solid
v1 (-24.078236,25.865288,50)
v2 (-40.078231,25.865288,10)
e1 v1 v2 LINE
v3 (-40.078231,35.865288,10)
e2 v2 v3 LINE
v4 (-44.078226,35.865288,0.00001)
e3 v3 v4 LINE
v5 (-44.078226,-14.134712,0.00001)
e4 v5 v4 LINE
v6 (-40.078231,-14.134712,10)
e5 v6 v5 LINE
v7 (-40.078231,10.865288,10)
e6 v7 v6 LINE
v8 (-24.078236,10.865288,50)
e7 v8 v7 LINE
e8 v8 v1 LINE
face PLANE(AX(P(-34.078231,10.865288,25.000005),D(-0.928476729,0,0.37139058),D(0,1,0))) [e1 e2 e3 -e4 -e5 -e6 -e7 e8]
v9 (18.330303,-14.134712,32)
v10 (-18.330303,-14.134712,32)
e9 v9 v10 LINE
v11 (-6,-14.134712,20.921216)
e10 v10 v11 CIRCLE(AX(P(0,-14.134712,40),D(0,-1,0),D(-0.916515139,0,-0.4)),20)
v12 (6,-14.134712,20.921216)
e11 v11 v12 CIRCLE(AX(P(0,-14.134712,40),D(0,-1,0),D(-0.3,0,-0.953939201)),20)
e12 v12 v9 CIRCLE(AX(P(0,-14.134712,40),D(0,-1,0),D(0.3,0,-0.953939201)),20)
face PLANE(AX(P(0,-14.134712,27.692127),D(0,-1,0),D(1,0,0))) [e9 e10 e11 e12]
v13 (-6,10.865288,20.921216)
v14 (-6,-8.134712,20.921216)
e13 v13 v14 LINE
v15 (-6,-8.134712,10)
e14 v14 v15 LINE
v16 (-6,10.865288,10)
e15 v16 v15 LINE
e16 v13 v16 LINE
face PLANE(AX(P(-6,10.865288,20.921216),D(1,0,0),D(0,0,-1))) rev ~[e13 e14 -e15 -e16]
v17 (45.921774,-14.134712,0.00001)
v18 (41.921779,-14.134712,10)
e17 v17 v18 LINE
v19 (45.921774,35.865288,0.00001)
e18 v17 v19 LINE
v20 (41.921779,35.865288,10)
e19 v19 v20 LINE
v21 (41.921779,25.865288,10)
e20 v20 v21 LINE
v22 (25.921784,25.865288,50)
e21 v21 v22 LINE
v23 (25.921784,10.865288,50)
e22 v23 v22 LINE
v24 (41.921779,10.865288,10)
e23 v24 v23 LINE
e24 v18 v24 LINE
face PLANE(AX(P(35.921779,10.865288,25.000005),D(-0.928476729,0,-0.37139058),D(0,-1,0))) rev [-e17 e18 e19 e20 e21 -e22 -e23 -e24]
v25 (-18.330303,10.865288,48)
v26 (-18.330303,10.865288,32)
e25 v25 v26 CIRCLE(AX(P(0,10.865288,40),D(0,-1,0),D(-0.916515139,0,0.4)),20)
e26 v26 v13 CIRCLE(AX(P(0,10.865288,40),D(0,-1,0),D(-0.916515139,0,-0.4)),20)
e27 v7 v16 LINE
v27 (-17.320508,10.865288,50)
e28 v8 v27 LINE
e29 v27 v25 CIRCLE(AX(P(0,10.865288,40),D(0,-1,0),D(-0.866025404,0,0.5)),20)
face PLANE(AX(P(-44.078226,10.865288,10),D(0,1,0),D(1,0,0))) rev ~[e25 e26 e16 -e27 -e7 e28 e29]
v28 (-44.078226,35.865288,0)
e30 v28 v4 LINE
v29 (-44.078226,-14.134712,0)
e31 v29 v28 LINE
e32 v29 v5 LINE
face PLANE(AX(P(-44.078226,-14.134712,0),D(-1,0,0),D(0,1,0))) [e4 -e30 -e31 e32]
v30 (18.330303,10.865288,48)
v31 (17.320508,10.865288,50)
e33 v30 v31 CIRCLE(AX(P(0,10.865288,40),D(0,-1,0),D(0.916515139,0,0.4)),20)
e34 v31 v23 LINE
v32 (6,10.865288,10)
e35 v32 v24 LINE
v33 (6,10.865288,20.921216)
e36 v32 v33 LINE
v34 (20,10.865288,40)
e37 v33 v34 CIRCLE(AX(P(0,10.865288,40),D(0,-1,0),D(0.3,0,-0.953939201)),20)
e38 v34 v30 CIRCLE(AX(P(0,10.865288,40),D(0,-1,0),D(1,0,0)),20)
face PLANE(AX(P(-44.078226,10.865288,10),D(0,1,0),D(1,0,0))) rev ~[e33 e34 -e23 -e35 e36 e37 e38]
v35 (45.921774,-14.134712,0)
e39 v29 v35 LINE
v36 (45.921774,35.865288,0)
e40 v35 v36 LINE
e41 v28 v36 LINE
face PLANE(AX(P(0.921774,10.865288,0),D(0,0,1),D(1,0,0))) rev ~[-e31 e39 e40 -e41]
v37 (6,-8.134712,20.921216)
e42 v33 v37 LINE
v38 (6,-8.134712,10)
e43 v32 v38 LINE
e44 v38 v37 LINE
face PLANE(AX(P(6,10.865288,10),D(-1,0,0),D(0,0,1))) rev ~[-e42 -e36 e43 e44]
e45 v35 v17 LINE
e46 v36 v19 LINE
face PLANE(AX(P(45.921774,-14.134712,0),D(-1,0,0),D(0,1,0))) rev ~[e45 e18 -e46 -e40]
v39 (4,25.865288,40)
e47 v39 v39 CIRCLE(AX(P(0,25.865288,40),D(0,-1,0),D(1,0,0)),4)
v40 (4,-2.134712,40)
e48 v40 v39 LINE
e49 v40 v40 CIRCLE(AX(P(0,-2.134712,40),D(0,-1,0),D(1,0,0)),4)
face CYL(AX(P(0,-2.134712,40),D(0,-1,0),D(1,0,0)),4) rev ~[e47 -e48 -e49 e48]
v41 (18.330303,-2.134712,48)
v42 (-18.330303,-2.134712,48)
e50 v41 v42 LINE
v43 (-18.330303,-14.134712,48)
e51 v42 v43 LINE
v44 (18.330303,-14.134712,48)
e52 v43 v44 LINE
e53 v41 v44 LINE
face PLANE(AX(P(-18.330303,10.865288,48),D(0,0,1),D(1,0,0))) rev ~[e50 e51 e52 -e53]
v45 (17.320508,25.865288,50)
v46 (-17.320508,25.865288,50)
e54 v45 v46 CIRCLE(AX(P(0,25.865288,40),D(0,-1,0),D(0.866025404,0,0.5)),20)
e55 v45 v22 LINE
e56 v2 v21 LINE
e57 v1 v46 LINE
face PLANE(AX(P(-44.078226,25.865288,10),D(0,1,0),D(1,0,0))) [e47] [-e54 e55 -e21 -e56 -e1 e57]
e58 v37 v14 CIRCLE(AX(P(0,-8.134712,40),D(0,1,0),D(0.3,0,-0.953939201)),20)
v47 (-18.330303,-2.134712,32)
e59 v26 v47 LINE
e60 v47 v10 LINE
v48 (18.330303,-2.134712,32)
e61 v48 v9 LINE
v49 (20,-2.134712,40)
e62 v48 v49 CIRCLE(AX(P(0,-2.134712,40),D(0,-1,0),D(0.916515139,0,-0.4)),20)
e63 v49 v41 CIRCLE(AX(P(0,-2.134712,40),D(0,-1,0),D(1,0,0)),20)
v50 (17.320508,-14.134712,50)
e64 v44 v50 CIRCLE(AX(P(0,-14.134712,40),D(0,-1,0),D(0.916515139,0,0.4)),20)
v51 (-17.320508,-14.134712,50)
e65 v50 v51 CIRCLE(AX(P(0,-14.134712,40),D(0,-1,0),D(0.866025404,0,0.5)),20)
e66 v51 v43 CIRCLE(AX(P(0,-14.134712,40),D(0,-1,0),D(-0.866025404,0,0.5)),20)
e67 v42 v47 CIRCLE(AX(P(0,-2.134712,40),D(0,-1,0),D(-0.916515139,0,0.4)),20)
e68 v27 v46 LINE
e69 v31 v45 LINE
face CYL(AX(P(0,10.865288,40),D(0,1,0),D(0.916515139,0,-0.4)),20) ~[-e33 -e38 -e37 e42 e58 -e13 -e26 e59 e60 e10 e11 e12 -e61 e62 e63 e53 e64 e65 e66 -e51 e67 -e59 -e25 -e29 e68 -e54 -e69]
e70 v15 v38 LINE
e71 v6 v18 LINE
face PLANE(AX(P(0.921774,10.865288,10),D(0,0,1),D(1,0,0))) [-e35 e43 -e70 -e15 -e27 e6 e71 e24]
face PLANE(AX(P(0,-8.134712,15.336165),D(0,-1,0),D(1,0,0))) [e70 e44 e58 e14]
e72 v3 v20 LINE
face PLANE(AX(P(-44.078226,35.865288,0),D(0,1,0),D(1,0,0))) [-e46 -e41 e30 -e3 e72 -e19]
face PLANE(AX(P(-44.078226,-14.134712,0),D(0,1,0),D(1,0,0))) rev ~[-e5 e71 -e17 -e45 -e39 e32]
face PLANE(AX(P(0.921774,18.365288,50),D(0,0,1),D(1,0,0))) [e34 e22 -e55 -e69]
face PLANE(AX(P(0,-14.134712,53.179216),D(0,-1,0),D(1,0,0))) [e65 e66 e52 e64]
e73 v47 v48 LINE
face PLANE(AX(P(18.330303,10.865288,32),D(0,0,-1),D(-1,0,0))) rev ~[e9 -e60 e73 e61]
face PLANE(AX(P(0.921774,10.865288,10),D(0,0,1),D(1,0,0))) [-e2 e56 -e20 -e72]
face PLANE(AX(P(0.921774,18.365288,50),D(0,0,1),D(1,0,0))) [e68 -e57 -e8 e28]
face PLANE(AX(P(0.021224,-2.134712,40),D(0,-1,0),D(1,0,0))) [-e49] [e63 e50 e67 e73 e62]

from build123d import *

# Parameters (mm, degrees)
F0_W      = 90
F0_H      = 50
F1_DEPTH  = 10
F2_W      = 90
F2_H      = 15
F3_DEPTH  = 40
F4_SIZE2  = 49.99999
F4_SIZE   = 19.99999
F5_SIZE2  = 19.99999
F5_SIZE   = 49.99999
F7_DEPTH  = 25
F8_DEPTH  = 15
F9_DEPTH  = 13
F10_DEPTH = 19
F11_R     = 4
F12_DEPTH = 40


# Not quite as in the source:
# - a fillet or chamfer is up to 0.001 mm smaller than in the source, because OpenCascade refuses the exact size


with BuildPart() as f1:
    # F0 (on Top) → F1 (new body)
    with BuildSketch(Plane.XY):
        with Locations((0.9217737243, 10.8652876893)):
            Rectangle(F0_W, F0_H)
    extrude(amount=F1_DEPTH)

    # F2 (on face) → F3 (join)
    with BuildSketch(Plane.XY.offset(10)):
        with Locations((0.9217737243, 18.3652876893)):
            Rectangle(F2_W, F2_H)
    extrude(amount=F3_DEPTH)

    # F4 (size 20 and 50 in the source; OpenCascade refuses exactly that, so slightly less here)
    f4_edges = [f1.edges().sort_by_distance(p)[0] for p in [
        (-44.078226, 18.365288, 50),
    ]]
    f4_side = f1.faces().sort_by_distance((0.921774, 18.365288, 50))[0]
    chamfer(f4_edges, length=F4_SIZE, length2=F4_SIZE2, reference=f4_side)

    # F5 (size 50 and 20 in the source; OpenCascade refuses exactly that, so slightly less here)
    f5_edges = [f1.edges().sort_by_distance(p)[0] for p in [
        (45.921774, 18.365288, 50),
    ]]
    f5_side = f1.faces().sort_by_distance((45.921774, 14.956197, 18.636364))[0]
    chamfer(f5_edges, length=F5_SIZE, length2=F5_SIZE2, reference=f5_side)

    # F6 (on face) → F7 (join)
    with BuildSketch(Plane.XZ.offset(-10.8652876893)):
        with BuildLine():
            Line((-17.3205080757, 50), (17.3205080757, 50))
            ThreePointArc((17.3205080757, 50), (0, 60), (-17.3205080757, 50))
        make_face()
        with BuildLine():
            Line((-18.3303027798, 48), (18.3303027798, 48))
            ThreePointArc((18.3303027798, 48), (17.8534332458, 49.0141511711), (17.3205080757, 50))
            Line((17.3205080757, 50), (-17.3205080757, 50))
            ThreePointArc((-17.3205080757, 50), (-17.8534332458, 49.0141511711), (-18.3303027798, 48))
        make_face()
        with BuildLine():
            ThreePointArc((6, 20.9212159717), (13.3669657075, 25.1230302893), (18.3303027798, 32))
            Line((18.3303027798, 32), (-18.3303027798, 32))
            ThreePointArc((-18.3303027798, 32), (-13.3669657075, 25.1230302893), (-6, 20.9212159717))
            ThreePointArc((-6, 20.9212159717), (0, 20), (6, 20.9212159717))
        make_face()
    extrude(amount=F7_DEPTH)

    # F8 (add): a face of the model
    f8_faces = [f1.faces().sort_by_distance(p)[0] for p in [
        (0, 10.8652876893, 54.100403238),
    ]]
    extrude(f8_faces, amount=F8_DEPTH)

    # F6 (on face) → F9 (join)
    with BuildSketch(Plane.XZ.offset(-10.8652876893)):
        with BuildLine():
            ThreePointArc((18.3303027798, 32), (19.5781262586, 35.9138071262), (20, 40))
            ThreePointArc((20, 40), (19.5781262586, 44.0861928738), (18.3303027798, 48))
            Line((18.3303027798, 48), (-18.3303027798, 48))
            ThreePointArc((-18.3303027798, 48), (-20, 40), (-18.3303027798, 32))
            Line((-18.3303027798, 32), (18.3303027798, 32))
        make_face()
    extrude(amount=F9_DEPTH)

    # F6 (on face) → F10 (join)
    with BuildSketch(Plane.XZ.offset(-10.8652876893)):
        with BuildLine():
            Line((6, 10), (6, 20.9212159717))
            ThreePointArc((6, 20.9212159717), (0, 20), (-6, 20.9212159717))
            Line((-6, 20.9212159717), (-6, 10))
            Line((-6, 10), (6, 10))
        make_face()
    extrude(amount=F10_DEPTH)

    # F11 (on face) → F12 (cut)
    with BuildSketch(Plane.XZ.offset(2.1347123107)):
        with Locations((0, 40)):
            Circle(F11_R)
    extrude(amount=-F12_DEPTH, mode=Mode.SUBTRACT)


solid = f1.part
